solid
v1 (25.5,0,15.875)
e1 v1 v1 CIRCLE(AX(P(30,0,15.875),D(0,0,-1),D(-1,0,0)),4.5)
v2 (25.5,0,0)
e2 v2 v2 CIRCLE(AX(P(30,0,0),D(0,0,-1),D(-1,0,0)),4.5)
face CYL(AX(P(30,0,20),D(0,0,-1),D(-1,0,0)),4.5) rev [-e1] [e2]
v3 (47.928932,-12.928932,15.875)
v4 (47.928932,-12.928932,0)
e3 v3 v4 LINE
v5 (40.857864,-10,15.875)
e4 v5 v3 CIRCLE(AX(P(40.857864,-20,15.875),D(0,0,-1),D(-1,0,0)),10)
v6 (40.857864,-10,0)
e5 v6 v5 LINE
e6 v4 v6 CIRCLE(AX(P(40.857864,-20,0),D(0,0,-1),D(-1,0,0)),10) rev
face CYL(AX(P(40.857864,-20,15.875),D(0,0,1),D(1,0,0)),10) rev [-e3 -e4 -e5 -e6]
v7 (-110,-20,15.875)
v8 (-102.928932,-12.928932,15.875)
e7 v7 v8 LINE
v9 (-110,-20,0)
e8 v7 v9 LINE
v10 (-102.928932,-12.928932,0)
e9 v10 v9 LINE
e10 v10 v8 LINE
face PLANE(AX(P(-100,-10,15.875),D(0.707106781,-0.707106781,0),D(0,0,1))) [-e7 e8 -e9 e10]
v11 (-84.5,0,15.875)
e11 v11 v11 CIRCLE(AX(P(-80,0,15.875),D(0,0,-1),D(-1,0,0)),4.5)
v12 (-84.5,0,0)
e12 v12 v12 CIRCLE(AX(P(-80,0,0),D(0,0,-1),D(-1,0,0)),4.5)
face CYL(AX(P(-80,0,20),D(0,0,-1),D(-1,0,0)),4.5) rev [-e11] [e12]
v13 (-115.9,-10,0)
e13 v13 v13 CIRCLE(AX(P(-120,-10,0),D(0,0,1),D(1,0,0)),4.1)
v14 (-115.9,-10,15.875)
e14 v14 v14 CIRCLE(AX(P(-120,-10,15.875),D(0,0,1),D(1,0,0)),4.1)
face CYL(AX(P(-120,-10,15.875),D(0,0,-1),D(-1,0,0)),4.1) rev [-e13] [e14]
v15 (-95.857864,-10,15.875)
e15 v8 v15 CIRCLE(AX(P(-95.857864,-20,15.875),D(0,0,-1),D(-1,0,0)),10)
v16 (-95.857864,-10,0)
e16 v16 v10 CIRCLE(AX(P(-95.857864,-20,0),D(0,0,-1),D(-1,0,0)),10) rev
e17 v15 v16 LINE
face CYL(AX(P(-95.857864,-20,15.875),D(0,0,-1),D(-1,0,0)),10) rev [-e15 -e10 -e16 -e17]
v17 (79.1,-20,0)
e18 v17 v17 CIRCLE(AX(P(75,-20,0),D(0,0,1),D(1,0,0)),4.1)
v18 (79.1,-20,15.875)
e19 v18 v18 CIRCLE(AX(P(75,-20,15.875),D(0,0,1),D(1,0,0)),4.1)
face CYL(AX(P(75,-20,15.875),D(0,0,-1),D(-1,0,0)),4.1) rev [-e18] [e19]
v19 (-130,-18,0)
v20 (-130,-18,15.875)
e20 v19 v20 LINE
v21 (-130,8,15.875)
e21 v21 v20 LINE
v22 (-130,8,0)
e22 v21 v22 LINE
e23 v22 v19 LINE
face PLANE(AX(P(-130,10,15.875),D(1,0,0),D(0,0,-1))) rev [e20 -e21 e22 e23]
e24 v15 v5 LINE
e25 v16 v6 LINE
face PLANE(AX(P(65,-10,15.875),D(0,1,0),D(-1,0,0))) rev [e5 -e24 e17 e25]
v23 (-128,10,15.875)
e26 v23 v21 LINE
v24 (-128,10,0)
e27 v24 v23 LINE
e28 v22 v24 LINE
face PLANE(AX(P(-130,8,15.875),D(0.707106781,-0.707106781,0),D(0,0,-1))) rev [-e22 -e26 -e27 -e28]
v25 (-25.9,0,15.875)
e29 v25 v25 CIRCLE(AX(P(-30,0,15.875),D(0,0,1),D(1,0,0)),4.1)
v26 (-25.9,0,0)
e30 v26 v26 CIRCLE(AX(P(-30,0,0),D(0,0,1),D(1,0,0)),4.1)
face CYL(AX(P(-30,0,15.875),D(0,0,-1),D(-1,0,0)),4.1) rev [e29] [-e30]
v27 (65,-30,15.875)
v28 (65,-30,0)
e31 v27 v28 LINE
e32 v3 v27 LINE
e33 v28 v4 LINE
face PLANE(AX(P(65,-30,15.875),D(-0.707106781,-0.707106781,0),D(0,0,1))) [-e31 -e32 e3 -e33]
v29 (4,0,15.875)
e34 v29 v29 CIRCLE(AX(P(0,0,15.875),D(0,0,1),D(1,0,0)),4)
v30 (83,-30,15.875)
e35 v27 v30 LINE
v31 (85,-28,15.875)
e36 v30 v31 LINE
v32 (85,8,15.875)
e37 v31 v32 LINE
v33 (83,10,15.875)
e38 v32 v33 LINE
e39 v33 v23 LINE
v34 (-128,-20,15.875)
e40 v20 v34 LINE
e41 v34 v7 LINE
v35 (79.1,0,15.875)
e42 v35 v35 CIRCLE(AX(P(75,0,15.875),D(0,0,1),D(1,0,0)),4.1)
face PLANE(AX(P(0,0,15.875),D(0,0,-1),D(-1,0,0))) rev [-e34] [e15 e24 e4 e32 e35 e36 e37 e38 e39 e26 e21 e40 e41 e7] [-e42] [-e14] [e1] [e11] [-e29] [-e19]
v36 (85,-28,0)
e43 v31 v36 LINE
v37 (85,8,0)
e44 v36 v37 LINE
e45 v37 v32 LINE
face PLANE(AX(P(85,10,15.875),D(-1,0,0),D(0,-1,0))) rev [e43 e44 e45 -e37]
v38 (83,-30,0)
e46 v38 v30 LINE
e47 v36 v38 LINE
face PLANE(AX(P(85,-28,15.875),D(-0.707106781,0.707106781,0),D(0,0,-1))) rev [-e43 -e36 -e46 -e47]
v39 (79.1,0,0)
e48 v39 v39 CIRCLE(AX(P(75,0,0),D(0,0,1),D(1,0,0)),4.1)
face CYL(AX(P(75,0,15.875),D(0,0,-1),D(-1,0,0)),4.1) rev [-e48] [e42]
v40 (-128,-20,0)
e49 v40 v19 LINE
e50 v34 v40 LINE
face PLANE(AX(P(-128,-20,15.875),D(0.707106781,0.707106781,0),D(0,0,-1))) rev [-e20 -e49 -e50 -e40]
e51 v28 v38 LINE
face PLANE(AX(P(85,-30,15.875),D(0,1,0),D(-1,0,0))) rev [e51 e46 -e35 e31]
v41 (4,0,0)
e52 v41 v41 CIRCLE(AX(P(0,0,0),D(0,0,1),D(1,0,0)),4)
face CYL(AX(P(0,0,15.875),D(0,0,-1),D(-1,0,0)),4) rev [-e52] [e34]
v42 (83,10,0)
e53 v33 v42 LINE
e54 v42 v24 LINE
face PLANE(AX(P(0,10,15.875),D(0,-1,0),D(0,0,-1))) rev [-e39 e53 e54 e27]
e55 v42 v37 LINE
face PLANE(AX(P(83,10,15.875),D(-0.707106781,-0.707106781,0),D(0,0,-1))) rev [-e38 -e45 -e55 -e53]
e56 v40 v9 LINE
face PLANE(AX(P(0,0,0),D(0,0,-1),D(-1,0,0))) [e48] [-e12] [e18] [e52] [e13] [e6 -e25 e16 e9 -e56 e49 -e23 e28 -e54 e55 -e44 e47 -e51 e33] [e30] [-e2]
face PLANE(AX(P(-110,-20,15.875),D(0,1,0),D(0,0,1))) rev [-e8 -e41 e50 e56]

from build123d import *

# Parameters (mm, degrees)
SKETCH_1_R          = 4
SKETCH_1_R_2        = 4.1
EXTRUDE_1_DEPTH     = 15.875
CHAMFER_1_SIZE      = 2
SKETCH_2_R          = 4.5
CUT_EXTRUDE_1_DEPTH = 20
SKETCH_3_R          = 4.5
CUT_EXTRUDE_2_DEPTH = 20
CHAMFER_2_SIZE      = 20
CHAMFER_3_SIZE      = 10
FILLET_1_R          = 10


with BuildPart() as part:
    # 草图1 → 凸台-拉伸1 (new body)
    with BuildSketch(Plane.XY):
        Polygon((0, 10), (-130, 10), (-130, -20), (-110, -20), (-110, -10), (0, -10), (65, -10), (65, -30), (85, -30), (85, 10), align=None)
        Circle(SKETCH_1_R, mode=Mode.SUBTRACT)
        with Locations((-30, 0)):
            Circle(SKETCH_1_R_2, mode=Mode.SUBTRACT)
        with Locations((75, 0)):
            Circle(SKETCH_1_R_2, mode=Mode.SUBTRACT)
        with Locations((75, -20)):
            Circle(SKETCH_1_R_2, mode=Mode.SUBTRACT)
        with Locations((-120, -10)):
            Circle(SKETCH_1_R_2, mode=Mode.SUBTRACT)
    extrude(amount=EXTRUDE_1_DEPTH)

    # 倒角1
    chamfer_1_edges = [part.edges().sort_by_distance(p)[0] for p in [
        (-130, 10, 7.9375),
        (85, 10, 7.9375),
        (85, -30, 7.9375),
        (-130, -20, 7.9375),
    ]]
    chamfer(chamfer_1_edges, length=CHAMFER_1_SIZE)

    # 草图2 → 切除-拉伸1 (cut)
    with BuildSketch(Plane(origin=(0, 0, 0), x_dir=(-1, 0, 0), z_dir=(0, 0, -1))):
        with Locations((-30, 0)):
            Circle(SKETCH_2_R)
    extrude(amount=-CUT_EXTRUDE_1_DEPTH, mode=Mode.SUBTRACT)

    # 草图3 → 切除-拉伸2 (cut)
    with BuildSketch(Plane(origin=(0, 0, 0), x_dir=(-1, 0, 0), z_dir=(0, 0, -1))):
        with Locations((80, 0)):
            Circle(SKETCH_3_R)
    extrude(amount=-CUT_EXTRUDE_2_DEPTH, mode=Mode.SUBTRACT)

    # 倒角2
    chamfer_2_edges = [part.edges().sort_by_distance(p)[0] for p in [
        (65, -10, 7.9375),
    ]]
    chamfer(chamfer_2_edges, length=CHAMFER_2_SIZE - 0.0001)  # a hair under: the kernel refuses the full size

    # 倒角3
    chamfer_3_edges = [part.edges().sort_by_distance(p)[0] for p in [
        (-110, -10, 7.9375),
    ]]
    chamfer(chamfer_3_edges, length=CHAMFER_3_SIZE - 0.0001)  # a hair under: the kernel refuses the full size

    # 圆角1
    fillet_1_edges = [part.edges().sort_by_distance(p)[0] for p in [
        (45.0001, -10, 7.9375),
        (-100.0001, -10, 7.9375),
    ]]
    fillet(fillet_1_edges, radius=FILLET_1_R)


solid = part.part
